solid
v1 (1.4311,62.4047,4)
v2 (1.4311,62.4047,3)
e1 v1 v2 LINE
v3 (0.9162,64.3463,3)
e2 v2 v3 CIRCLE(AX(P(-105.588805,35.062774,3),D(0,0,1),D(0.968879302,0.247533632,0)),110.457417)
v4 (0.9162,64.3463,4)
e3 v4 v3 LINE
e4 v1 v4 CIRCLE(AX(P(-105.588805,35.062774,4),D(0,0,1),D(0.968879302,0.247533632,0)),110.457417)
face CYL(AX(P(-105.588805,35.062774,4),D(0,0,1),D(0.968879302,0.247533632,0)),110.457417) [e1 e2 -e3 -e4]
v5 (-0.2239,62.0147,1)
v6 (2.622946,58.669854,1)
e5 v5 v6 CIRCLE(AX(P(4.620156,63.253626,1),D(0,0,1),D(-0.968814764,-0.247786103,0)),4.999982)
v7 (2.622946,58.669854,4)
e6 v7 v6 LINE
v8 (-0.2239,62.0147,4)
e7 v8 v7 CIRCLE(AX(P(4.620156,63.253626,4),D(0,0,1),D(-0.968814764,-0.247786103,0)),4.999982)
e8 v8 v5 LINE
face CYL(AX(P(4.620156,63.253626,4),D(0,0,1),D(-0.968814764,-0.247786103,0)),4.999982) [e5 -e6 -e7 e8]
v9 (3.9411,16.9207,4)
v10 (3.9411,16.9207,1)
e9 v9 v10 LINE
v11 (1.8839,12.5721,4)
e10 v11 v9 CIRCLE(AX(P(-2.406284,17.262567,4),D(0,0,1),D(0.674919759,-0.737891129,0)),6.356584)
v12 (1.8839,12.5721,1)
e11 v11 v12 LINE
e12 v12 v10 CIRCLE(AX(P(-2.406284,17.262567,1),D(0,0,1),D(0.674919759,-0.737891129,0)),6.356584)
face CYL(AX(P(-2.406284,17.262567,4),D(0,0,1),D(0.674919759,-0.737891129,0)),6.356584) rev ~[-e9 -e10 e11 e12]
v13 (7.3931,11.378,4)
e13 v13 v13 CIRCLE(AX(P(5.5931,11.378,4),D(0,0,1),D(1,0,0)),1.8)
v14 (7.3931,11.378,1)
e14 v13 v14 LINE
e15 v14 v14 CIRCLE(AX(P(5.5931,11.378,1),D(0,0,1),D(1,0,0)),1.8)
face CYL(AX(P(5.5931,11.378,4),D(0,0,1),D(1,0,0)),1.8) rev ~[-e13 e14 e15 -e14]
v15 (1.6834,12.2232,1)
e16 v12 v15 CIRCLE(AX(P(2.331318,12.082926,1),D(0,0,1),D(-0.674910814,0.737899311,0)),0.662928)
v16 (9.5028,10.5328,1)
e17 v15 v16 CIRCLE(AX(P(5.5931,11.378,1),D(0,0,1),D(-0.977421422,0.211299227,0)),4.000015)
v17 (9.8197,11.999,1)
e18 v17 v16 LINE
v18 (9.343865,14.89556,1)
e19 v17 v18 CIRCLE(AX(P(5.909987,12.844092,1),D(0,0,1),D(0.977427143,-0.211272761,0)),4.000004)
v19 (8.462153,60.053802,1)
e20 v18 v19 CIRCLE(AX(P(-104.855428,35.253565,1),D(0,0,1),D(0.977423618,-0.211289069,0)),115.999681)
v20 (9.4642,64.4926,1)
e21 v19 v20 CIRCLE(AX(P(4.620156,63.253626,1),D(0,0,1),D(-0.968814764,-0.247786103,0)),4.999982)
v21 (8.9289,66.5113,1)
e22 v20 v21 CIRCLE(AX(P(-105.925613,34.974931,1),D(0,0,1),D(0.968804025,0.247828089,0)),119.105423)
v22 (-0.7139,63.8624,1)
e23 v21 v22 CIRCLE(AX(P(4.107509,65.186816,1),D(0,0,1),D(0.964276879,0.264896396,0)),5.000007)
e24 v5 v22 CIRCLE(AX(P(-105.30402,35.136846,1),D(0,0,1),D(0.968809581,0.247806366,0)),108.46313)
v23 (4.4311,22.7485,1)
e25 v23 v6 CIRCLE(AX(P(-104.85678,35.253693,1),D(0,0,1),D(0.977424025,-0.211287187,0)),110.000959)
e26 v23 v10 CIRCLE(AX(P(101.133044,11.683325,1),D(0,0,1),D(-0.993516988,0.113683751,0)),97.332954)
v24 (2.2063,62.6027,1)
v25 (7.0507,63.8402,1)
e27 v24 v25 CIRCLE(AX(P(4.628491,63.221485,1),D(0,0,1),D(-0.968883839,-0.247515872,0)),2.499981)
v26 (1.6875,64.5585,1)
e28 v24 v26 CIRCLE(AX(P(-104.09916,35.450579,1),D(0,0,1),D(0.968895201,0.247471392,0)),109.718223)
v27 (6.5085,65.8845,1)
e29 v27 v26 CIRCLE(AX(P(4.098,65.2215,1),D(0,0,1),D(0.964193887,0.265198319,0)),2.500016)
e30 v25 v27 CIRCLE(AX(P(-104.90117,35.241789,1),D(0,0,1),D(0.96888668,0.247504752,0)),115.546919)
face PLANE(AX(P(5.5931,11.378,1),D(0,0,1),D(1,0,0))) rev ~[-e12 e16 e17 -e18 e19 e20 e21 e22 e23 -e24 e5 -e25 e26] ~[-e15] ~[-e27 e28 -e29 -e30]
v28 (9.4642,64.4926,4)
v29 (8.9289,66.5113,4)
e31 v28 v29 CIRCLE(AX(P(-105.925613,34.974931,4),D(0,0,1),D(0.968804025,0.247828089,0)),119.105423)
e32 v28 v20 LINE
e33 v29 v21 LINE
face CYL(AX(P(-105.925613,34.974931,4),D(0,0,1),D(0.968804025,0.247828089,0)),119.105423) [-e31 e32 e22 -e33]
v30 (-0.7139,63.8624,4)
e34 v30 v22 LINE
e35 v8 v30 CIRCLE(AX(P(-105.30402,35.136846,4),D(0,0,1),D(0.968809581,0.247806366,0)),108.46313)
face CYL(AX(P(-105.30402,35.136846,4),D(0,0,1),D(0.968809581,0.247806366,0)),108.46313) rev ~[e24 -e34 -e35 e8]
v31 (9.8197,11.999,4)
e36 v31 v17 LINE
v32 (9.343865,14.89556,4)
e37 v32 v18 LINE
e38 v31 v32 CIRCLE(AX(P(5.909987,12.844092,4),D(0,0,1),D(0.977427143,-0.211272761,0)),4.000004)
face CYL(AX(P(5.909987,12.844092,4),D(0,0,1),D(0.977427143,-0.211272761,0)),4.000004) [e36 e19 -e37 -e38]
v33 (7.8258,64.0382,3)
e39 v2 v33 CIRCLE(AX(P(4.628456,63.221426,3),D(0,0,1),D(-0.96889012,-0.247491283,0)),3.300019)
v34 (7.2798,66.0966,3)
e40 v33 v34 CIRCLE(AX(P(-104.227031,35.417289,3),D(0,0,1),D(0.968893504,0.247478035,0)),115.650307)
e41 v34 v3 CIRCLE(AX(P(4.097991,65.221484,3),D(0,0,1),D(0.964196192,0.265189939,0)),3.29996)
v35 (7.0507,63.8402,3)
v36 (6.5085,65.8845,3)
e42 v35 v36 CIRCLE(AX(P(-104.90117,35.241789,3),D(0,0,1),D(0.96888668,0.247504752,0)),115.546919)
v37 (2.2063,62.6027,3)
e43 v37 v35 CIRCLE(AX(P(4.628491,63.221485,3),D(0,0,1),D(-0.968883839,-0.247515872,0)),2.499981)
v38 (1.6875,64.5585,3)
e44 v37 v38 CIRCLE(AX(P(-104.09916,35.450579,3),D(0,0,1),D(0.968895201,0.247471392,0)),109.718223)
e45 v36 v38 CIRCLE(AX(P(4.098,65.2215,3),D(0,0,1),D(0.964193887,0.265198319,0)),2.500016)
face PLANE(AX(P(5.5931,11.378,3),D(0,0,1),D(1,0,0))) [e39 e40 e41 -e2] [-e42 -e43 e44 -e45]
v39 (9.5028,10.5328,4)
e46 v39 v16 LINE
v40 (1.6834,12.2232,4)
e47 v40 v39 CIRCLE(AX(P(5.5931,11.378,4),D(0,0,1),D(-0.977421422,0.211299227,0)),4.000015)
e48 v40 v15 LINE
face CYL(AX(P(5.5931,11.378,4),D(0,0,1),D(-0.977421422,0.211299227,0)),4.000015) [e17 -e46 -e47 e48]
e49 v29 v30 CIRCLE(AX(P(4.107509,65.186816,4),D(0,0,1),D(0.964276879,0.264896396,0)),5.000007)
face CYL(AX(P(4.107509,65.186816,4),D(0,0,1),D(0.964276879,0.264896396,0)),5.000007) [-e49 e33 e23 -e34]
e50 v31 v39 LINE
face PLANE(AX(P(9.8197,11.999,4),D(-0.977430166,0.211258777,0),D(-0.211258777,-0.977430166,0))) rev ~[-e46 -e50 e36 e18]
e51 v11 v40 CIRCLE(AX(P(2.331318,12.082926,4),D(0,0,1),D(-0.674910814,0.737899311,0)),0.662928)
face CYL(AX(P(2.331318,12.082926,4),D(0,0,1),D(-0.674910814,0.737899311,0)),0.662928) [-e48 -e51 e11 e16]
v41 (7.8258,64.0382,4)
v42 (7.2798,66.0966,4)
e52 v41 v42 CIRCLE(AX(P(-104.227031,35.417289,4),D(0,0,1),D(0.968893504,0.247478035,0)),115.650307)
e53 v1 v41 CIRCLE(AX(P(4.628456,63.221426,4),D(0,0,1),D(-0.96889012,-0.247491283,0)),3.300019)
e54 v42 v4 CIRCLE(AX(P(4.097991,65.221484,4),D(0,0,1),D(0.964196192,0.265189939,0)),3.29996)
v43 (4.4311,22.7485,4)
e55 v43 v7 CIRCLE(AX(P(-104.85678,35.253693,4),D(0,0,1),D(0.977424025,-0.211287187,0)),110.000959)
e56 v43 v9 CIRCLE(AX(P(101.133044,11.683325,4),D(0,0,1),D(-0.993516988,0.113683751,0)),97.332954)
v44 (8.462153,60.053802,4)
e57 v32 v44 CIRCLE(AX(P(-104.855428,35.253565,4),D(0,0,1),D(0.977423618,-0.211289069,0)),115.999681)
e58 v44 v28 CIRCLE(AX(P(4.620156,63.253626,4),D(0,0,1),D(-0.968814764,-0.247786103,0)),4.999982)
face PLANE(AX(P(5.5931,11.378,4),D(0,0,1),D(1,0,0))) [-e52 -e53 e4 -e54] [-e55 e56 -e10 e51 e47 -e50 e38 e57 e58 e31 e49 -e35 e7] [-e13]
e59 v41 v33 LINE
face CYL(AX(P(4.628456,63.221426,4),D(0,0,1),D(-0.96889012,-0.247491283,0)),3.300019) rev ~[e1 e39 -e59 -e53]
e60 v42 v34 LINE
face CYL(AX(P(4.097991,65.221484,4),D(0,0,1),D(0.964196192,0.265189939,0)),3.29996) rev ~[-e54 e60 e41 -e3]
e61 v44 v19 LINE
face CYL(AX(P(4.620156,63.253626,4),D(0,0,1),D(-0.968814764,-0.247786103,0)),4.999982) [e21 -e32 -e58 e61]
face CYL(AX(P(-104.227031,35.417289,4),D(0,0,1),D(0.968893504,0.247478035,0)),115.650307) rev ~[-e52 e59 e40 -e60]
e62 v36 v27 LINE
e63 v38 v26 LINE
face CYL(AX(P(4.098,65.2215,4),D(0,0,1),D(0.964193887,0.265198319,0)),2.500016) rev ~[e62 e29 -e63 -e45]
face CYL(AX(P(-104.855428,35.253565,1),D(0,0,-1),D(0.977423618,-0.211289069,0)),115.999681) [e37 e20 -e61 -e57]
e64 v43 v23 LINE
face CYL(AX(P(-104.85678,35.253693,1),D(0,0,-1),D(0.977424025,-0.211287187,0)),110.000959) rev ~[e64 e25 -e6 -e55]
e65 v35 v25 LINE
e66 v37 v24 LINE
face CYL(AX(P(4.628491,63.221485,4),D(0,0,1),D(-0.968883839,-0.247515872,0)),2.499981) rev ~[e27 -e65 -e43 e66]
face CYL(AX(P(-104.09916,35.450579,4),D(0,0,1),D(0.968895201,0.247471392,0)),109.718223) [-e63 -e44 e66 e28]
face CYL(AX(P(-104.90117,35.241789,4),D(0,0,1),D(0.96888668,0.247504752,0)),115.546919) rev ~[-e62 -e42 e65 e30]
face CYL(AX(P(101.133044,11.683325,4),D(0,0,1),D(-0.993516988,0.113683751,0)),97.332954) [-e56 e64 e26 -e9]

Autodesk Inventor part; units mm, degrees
ref_plane "Work Plane1" through (-0.0405, 69.8618, 0) normal (0, 0, 1) x (0.6413599, 0.7672402, 0)
ref_plane "Work Plane3" through (5.5931, 11.378, 1) normal (0, 0, 1) x (1, 0, 0)
sketch "Sketch2" plane through (5.5931, 11.378, 1) normal (0, 0, 1) x (1, 0, 0)
  arc A0 (-2.9323, 0.6339) -> (-4.1247, 52.0744) centre (-110.4489, 23.8756) ccw projected
  arc A1 (2.9323, -0.6339) -> (1.6748, 53.6125) centre (-110.4489, 23.8756) ccw projected
  arc A2 (1.6748, 53.6125) -> (-4.1247, 52.0744) centre (-1.225, 52.8435) ccw projected
  circle A3 centre (0, 0) radius 3 projected
  circle A4 centre (0, 0) radius 1.25 projected
  circle A5 centre (-1.225, 52.8435) radius 3 projected
  circle A6 centre (-1.225, 52.8435) radius 1.4795 projected
  point P0 (-5.5931, -11.378)
  point P1 (-2.9323, 0.6339)
  point P2 (2.9323, -0.6339)
extrude "Extrusion2" add sketch "Sketch2" along normal blind 3
ref_plane "Work Plane6" through (4.3681, 64.2214, 5) normal (0, 0, 1) x (1, 0, 0)
sketch "Sketch4" plane through (4.3681, 64.2214, 4) normal (0, 0, 1) x (1, 0, 0)
  arc A0 (4.1572, -53.4773) -> (2.8997, 0.7691) centre (-109.2239, -28.9678) ccw construction
  arc A1 (-1.7073, -52.2096) -> (-2.8997, -0.7691) centre (-109.2239, -28.9678) ccw construction
  circle A2 centre (0, 0) radius 3 construction
  circle A3 centre (0, 0) radius 3 construction
  circle A4 centre (0, 0) radius 1.4795 construction
  arc A5 (0.2521, -0.9677) -> (-0.2606, 0.9654) centre (-109.2239, -28.9678) ccw construction
  arc A6 (5.0961, 0.2712) -> (4.5608, 2.2899) centre (-109.2239, -28.9678) ccw
  arc A7 (-4.592, -2.2067) -> (-5.082, -0.359) centre (-109.2239, -28.9678) ccw
  arc A8 (-4.592, -2.2067) -> (5.0961, 0.2712) centre (0.2521, -0.9677) ccw
  arc A9 (4.5608, 2.2899) -> (-5.082, -0.359) centre (-0.2606, 0.9654) ccw
  arc A10 (-1.7073, -52.2096) -> (4.1572, -53.4773) centre (1.225, -52.8435) ccw projected
  arc A11 (2.8997, 0.7691) -> (-2.8997, -0.7691) centre (0, 0) ccw projected
  arc A12 (-1.7073, -52.2096) -> (-2.8997, -0.7691) centre (-109.2239, -28.9678) ccw projected
  point P0 (-4.3681, -64.2214)
  dimension "d16" = 10
  dimension "d26" = 1
  dimension "d27" = 1
extrude "Extrusion4" add sketch "Sketch4" against normal blind 3
ref_plane "Work Plane7" through (5.5931, 11.378, 5) normal (0, 0, 1) x (1, 0, 0)
sketch "Sketch5" plane through (5.5931, 11.378, 5) normal (0, 0, 1) x (1, 0, 0)
  arc A0 (-0.9646, 51.8435) -> (-1.4951, 53.8435) centre (-110.4489, 23.8756) ccw construction
  arc A1 (0.7309, 52.2766) -> (0.1923, 54.3076) centre (-110.4489, 23.8756) ccw
  arc A2 (-2.6602, 51.4103) -> (-3.1824, 53.3794) centre (-110.4489, 23.8756) ccw
  arc A3 (-2.6602, 51.4103) -> (0.7309, 52.2766) centre (-0.9646, 51.8435) ccw
  arc A4 (0.1923, 54.3076) -> (-3.1824, 53.3794) centre (-1.4951, 53.8435) ccw
  arc A5 (2.6687, 52.7716) -> (2.1206, 54.838) centre (-110.4489, 23.8756) ccw projected
  arc A6 (2.1206, 54.838) -> (-5.1108, 52.849) centre (-1.4951, 53.8435) ccw projected
  arc A7 (-4.598, 50.9153) -> (-5.1108, 52.849) centre (-110.4489, 23.8756) ccw projected
  arc A8 (-4.598, 50.9153) -> (2.6687, 52.7716) centre (-0.9646, 51.8435) ccw projected
  arc A9 (3.3358, 55.1334) -> (-6.307, 52.4844) centre (-1.4856, 53.8089) ccw projected
  arc A10 (3.8712, 53.1147) -> (3.3358, 55.1334) centre (-110.4489, 23.8756) ccw projected
  arc A11 (2.869, 48.6758) -> (3.8712, 53.1147) centre (-0.9729, 51.8758) ccw projected
  arc A12 (-5.817, 50.6368) -> (-2.9702, 47.292) centre (-0.9729, 51.8758) ccw projected
  arc A13 (-5.817, 50.6368) -> (-6.307, 52.4844) centre (-110.4489, 23.8756) ccw projected
  point P0 (-5.5931, -11.378)
  dimension "d12" = 3.5
extrude "Extrusion5" cut sketch "Sketch5" against normal blind 5 contours A3 A2 A4 A1
sketch "Sketch7" plane through (5.5931, 11.378, 4) normal (0, 0, 1) x (1, 0, 0)
  circle A0 centre (0, 0) radius 1.25 projected
  circle A1 centre (0, 0) radius 1.8
  arc A2 (-3.9097, 0.8452) -> (3.9097, -0.8452) centre (0, 0) ccw
  arc A3 (4.2266, 0.621) -> (-3.5928, 2.3113) centre (0.3169, 1.4661) ccw
  arc A4 (-2.9323, 0.6339) -> (-2.9702, 47.292) centre (-110.4489, 23.8756) ccw projected
  arc A5 (2.9323, -0.6339) -> (2.869, 48.6758) centre (-110.4489, 23.8756) ccw projected
  line L0 (0.3169, 1.4661) -> (0, 0) construction
  line L1 (-3.5928, 2.3113) -> (-3.9097, 0.8452)
  line L2 (4.2266, 0.621) -> (3.9097, -0.8452)
  line L3 (-2.9323, 0.6339) -> (2.9323, -0.6339) construction
  point P0 (-5.5931, -11.378)
  dimension "d19" = 3.6
  dimension "d20" = 8
  dimension "d21" = 1.5
extrude "Extrusion6" cut sketch "Sketch7" against normal up to surface (3 mm away) contours A1
extrude "Extrusion7" add sketch "Sketch7" against normal up to surface (3 mm away) contours L1 A3 L2 A2
sketch "Sketch8" plane through (5.5931, 11.378, 4) normal (0, 0, 1) x (1, 0, 0)
  arc A0 (-2.6602, 51.4103) -> (-3.1824, 53.3794) centre (-110.4489, 23.8756) ccw projected
  arc A1 (0.1923, 54.3076) -> (-3.1824, 53.3794) centre (-1.4951, 53.8435) ccw projected
  arc A2 (0.7309, 52.2766) -> (0.1923, 54.3076) centre (-110.4489, 23.8756) ccw projected
  arc A3 (-2.6602, 51.4103) -> (0.7309, 52.2766) centre (-0.9646, 51.8435) ccw projected
  arc A4 (-3.3868, 51.2247) -> (-3.9056, 53.1805) centre (-110.4489, 23.8756) ccw
  arc A5 (-3.3868, 51.2247) -> (1.4576, 52.4622) centre (-0.9646, 51.8435) ccw
  arc A6 (1.4576, 52.4622) -> (0.9154, 54.5065) centre (-110.4489, 23.8756) ccw
  arc A7 (0.9154, 54.5065) -> (-3.9056, 53.1805) centre (-1.4951, 53.8435) ccw
  arc A8 (-4.162, 51.0267) -> (-4.6769, 52.9683) centre (-110.4489, 23.8756) ccw
  arc A9 (-4.162, 51.0267) -> (2.2327, 52.6602) centre (-0.9646, 51.8435) ccw
  arc A10 (2.2327, 52.6602) -> (1.6867, 54.7186) centre (-110.4489, 23.8756) ccw
  arc A11 (1.6867, 54.7186) -> (-4.6769, 52.9683) centre (-1.4951, 53.8435) ccw
  point P0 (-5.5931, -11.378)
  dimension "d31" = 2.5
  dimension "d32" = 0.8
extrude "Extrusion8" cut sketch "Sketch8" against normal up to surface (3 mm away) contours A4 A7 A6 A5
extrude "Extrusion9" cut sketch "Sketch8" against normal blind 1 contours A8 A11 A10 A9
sketch "Sketch9" plane through (5.5931, 11.378, 4) normal (0, 0, 1) x (1, 0, 0)
  arc A0 (-3.9097, 0.8452) -> (3.9097, -0.8452) centre (0, 0) ccw projected
  arc A1 (3.7507, 3.5177) -> (2.869, 48.6758) centre (-110.4489, 23.8756) ccw projected
  arc A2 (-4.162, 51.0267) -> (-4.6769, 52.9683) centre (-110.4489, 23.8756) ccw projected
  arc A3 (1.6867, 54.7186) -> (-4.6769, 52.9683) centre (-1.4951, 53.8435) ccw projected
  arc A4 (2.2327, 52.6602) -> (1.6867, 54.7186) centre (-110.4489, 23.8756) ccw projected
  arc A5 (-4.162, 51.0267) -> (2.2327, 52.6602) centre (-0.9646, 51.8435) ccw projected
  circle A6 centre (0, 0) radius 1.8 projected
  arc A7 (3.7507, 3.5177) -> (2.869, 48.6758) centre (-110.4489, 23.8756) ccw projected
  arc A8 (2.869, 48.6758) -> (3.8712, 53.1147) centre (-0.9729, 51.8758) ccw projected
  arc A9 (3.8712, 53.1147) -> (3.3358, 55.1334) centre (-110.4489, 23.8756) ccw projected
  arc A10 (3.3358, 55.1334) -> (-6.307, 52.4844) centre (-1.4856, 53.8089) ccw projected
  arc A11 (-5.817, 50.6368) -> (-6.307, 52.4844) centre (-110.4489, 23.8756) ccw projected
  arc A12 (-5.817, 50.6368) -> (-2.9702, 47.292) centre (-0.9729, 51.8758) ccw projected
  arc A13 (-2.148, 4.6164) -> (-2.9702, 47.292) centre (-110.4489, 23.8756) ccw projected
  arc A14 (-2.148, 4.6164) -> (-3.5928, 2.3113) centre (0.3169, 1.4661) ccw projected
  line L0 (-3.5928, 2.3113) -> (-3.9097, 0.8452) projected
  arc A15 (-3.9097, 0.8452) -> (3.9097, -0.8452) centre (0, 0) ccw projected
  line L1 (3.9097, -0.8452) -> (4.2266, 0.621) projected
  arc A16 (4.2266, 0.621) -> (3.7507, 3.5177) centre (0.3169, 1.4661) ccw projected
  arc A17 (-3.7092, 1.1941) -> (-3.9097, 0.8452) centre (-3.262, 0.7051) ccw
  arc A18 (-3.7092, 1.1941) -> (-1.652, 5.5427) centre (-7.9997, 5.8848) ccw
  arc A19 (-2.148, 4.6164) -> (-2.9702, 47.292) centre (-110.4489, 23.8756) ccw projected
  arc A20 (-1.162, 11.3705) -> (-1.652, 5.5427) centre (95.5412, 0.3052) ccw
  point P0 (-5.5931, -11.378)
  point P1 (3.7507, 3.5177)
  point P2 (-1.162, 11.3705)
extrude "Extrusion10" cut sketch "Sketch9" against normal up to surface (3 mm away) contours L0 A14 A13 A20 A18 A17
